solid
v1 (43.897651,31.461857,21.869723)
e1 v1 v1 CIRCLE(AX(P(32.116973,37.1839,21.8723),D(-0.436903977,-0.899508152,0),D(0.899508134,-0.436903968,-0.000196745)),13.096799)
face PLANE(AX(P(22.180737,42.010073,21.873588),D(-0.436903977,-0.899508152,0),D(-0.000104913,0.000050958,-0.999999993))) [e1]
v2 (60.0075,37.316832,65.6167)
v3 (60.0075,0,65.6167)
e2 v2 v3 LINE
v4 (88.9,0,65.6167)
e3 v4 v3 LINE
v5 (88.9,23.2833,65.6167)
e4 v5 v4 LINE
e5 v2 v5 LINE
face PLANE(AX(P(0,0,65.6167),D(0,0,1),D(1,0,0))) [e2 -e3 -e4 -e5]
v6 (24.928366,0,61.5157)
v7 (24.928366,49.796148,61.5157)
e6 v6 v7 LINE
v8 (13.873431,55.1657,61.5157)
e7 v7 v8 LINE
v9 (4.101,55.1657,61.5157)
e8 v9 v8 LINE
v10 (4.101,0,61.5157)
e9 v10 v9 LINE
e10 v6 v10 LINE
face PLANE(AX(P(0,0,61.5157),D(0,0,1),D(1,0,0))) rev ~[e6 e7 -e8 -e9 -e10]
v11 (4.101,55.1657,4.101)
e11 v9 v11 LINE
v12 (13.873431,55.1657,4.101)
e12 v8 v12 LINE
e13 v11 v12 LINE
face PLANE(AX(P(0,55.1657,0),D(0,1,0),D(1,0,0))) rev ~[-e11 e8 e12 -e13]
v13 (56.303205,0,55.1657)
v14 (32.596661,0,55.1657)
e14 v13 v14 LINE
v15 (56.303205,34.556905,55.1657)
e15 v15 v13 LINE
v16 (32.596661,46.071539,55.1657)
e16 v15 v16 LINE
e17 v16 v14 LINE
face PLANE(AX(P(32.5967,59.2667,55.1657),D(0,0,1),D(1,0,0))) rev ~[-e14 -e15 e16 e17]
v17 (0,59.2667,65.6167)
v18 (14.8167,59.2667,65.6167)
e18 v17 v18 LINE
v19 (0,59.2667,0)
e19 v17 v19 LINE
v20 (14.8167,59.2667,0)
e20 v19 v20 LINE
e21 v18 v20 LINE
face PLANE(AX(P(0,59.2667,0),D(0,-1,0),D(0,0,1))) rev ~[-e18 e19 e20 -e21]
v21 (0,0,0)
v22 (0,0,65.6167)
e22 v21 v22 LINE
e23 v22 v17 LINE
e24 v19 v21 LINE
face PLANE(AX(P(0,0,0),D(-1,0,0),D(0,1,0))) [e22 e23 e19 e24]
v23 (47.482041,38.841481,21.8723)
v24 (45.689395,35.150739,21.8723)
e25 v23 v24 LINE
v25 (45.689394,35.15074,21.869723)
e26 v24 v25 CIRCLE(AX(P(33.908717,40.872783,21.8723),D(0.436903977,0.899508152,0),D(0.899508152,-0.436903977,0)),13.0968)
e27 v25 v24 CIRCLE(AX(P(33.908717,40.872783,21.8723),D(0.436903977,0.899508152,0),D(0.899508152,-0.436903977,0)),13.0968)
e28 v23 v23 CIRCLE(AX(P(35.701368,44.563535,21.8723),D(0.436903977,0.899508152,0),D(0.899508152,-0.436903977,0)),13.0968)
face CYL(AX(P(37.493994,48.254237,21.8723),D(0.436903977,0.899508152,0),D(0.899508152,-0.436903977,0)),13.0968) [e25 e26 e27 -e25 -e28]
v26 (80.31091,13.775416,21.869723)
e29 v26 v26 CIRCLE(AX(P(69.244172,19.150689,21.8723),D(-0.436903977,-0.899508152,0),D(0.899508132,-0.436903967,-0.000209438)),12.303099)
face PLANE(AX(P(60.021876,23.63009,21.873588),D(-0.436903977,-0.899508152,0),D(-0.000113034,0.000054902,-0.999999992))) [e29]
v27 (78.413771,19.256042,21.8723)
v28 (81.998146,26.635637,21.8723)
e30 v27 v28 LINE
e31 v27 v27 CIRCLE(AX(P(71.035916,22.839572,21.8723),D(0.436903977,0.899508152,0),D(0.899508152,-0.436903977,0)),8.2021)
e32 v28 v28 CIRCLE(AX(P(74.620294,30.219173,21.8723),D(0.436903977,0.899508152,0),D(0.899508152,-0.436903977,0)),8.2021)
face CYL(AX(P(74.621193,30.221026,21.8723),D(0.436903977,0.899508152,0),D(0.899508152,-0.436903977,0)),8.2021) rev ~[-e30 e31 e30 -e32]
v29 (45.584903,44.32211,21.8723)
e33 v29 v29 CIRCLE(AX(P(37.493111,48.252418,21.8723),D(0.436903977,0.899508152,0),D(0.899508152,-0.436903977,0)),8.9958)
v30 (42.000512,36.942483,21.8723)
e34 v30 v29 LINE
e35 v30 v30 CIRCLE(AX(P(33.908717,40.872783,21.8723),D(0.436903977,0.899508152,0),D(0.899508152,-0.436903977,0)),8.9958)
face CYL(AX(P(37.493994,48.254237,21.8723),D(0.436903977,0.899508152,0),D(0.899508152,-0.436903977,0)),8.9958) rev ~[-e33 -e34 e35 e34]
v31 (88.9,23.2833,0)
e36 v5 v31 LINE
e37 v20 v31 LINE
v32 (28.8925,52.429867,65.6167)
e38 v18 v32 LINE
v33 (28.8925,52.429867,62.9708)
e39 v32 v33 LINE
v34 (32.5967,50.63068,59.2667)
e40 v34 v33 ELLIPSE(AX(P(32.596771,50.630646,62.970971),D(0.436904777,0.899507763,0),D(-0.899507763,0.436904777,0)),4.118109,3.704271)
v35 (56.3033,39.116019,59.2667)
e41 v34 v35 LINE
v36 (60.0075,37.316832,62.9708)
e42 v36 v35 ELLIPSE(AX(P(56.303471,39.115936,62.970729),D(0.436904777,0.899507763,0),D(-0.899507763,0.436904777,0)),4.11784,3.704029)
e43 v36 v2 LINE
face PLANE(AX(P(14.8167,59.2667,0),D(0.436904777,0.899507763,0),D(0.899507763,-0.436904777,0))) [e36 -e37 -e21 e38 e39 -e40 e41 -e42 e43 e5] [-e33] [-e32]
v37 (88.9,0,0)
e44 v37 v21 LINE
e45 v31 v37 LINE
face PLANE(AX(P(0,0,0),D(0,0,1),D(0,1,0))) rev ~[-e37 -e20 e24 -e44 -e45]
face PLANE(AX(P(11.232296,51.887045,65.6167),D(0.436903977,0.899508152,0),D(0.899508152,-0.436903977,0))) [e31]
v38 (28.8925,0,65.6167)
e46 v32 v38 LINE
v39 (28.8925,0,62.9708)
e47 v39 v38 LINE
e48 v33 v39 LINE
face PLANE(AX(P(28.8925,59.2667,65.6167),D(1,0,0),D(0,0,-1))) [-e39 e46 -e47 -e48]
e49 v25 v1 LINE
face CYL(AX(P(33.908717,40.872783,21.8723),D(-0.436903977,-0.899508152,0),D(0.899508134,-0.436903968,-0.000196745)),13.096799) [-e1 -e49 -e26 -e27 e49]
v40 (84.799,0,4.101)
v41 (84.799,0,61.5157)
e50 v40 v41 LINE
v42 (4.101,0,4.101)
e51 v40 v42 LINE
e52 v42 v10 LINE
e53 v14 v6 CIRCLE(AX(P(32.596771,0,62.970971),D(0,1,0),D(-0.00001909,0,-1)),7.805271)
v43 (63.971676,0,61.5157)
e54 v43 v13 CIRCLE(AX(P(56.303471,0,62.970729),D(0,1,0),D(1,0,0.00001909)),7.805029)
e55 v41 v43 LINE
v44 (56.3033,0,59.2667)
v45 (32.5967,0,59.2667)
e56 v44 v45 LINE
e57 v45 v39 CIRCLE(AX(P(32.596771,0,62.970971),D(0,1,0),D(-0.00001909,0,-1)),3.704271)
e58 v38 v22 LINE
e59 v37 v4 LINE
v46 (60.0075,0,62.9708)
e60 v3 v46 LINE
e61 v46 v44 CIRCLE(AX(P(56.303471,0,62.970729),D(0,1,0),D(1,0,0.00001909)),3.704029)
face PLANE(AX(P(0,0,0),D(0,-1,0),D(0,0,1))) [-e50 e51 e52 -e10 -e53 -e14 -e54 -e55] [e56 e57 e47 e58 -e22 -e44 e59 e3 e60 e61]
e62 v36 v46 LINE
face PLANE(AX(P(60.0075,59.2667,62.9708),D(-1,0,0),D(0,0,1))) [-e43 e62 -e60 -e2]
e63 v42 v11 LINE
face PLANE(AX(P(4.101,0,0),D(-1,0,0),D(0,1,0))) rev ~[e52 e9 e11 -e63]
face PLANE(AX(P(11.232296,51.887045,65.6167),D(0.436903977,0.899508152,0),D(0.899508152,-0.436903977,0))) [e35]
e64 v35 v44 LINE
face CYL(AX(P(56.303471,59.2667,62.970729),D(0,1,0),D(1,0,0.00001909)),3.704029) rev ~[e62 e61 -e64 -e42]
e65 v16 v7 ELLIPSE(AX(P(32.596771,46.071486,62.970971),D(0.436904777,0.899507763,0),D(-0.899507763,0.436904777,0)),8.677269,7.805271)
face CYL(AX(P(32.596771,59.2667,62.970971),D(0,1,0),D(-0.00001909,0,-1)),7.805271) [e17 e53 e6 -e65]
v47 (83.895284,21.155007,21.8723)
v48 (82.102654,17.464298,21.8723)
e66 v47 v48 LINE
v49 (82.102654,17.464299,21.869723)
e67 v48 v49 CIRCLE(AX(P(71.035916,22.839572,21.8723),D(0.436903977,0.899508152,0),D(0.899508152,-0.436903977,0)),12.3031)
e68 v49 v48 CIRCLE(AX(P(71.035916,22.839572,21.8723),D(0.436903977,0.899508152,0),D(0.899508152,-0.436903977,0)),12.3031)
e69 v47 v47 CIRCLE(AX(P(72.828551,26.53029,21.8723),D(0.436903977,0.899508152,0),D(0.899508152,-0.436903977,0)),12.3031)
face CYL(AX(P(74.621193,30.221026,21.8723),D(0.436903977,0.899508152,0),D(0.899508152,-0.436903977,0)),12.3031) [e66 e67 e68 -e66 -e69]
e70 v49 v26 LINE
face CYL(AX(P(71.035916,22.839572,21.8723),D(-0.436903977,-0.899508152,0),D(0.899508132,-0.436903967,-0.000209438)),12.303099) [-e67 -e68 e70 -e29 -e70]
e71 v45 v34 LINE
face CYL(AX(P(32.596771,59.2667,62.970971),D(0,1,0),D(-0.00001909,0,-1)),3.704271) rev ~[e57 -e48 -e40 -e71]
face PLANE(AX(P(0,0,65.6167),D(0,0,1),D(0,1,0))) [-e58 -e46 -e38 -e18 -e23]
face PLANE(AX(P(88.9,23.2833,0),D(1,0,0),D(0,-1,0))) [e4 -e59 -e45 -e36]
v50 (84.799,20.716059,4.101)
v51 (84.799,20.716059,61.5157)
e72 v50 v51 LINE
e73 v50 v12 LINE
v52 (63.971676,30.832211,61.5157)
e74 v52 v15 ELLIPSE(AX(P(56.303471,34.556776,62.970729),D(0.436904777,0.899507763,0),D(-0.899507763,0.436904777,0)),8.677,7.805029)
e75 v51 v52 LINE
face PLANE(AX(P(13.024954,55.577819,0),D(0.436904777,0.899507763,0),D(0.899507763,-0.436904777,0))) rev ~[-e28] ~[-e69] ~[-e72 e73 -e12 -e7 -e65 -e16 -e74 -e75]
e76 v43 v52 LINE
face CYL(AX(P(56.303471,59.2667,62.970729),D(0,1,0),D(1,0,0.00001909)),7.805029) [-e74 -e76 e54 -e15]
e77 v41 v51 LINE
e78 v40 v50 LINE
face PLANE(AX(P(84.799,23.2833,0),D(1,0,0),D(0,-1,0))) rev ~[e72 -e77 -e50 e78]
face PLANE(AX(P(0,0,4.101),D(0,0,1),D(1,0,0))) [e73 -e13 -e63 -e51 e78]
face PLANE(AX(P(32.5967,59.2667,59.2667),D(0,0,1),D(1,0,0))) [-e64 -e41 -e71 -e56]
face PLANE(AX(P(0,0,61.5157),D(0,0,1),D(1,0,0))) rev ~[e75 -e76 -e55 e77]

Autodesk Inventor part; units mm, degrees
ref_plane "YZ Plane" through (0, 0, 0) normal (1, 0, 0) x (0, 1, 0)
ref_plane "XZ Plane" through (0, 0, 0) normal (0, 1, 0) x (-1, 0, 0)
ref_plane "XY Plane" through (0, 0, 0) normal (0, 0, 1) x (1, 0, 0)
sketch "Sketch1" plane through (0, 0, 0) normal (0, 0, 1) x (1, 0, 0)
  line L0 (0, 0) -> (0, 59.2667)
  line L1 (0, 59.2667) -> (14.8167, 59.2667)
  line L2 (14.8167, 59.2667) -> (88.9, 23.2833)
  line L3 (88.9, 23.2833) -> (88.9, 0)
  line L4 (88.9, 0) -> (0, 0)
  dimension "OverallHeight" = 59.2667
  dimension "TopWidth" = 14.8167
  dimension "RightHeight" = 23.2833
  dimension "OverallWidth" = 88.9
extrude "Extrusion1" add sketch "Sketch1" along normal blind 65.6167
sketch "Sketch2" plane through (14.8167, 59.2667, 65.6167) normal (0.436904, 0.8995082, 0) x (0.8995082, -0.436904, 0)
  circle A0 centre (25.2098, 43.7444) radius 8.9958
  circle A1 centre (66.4848, 43.7444) radius 8.2021
  line L0 (0, 65.6167) -> (82.3598, 65.6167) projected
  line L1 (82.3598, 65.6167) -> (82.3598, 0) projected
  point P0 (12.5661, 65.6167)
  dimension "UpperHoleDiameter" = 17.9917
  dimension "LowerHoleDiameter" = 16.4042
  dimension "EdgeDistance" = 15.875
  dimension "HoleAllignment" = 0
  dimension "HoleToCenter" = 41.275
  dimension "BackEdgeToHoleCenters" = 21.8722
extrude "Extrusion2" cut sketch "Sketch2" against normal blind 8.2021
sketch "Sketch3" plane through (14.8167, 59.2667, 65.6167) normal (0.436904, 0.8995082, 0) x (0.8995082, -0.436904, 0)
  line L0 (82.3598, 0) -> (0, 0) projected
  line L1 (22.3523, 0) -> (53.4673, 0)
  line L2 (26.0565, 6.35) -> (49.7632, 6.35)
  line L3 (22.3523, 0) -> (22.3523, 2.6458)
  line L4 (53.4673, 2.6458) -> (53.4673, 0)
  line L5 (82.3598, 65.6167) -> (82.3598, 0) projected
  arc A0 (26.0565, 6.35) -> (22.3523, 2.6458) centre (26.0565, 2.6458) ccw
  arc A1 (53.4673, 2.6458) -> (49.7632, 6.35) centre (49.7632, 2.6458) ccw
  point P0 (12.5661, 65.6167)
  dimension "NotchWidth" = 31.115
  dimension "NotchDepth" = 6.35
  dimension "NotchLocation" = 28.8925
  dimension "d18" = 3.7042
sketch "Sketch4" plane through (0, 59.2667, 0) normal (0, 1, 0) x (1, 0, 0)
  line L0 (88.9, -65.6167) -> (0, -65.6167)
  line L1 (28.8925, -65.6167) -> (60.0075, -65.6167)
  line L2 (32.5967, -59.2667) -> (56.3033, -59.2667)
  line L3 (28.8925, -65.6167) -> (28.8925, -62.9708)
  line L4 (60.0075, -62.9708) -> (60.0075, -65.6167)
  line L5 (88.9, 57.15) -> (88.9, -65.6167)
  arc A0 (32.5967, -59.2667) -> (28.8925, -62.9708) centre (32.5967, -62.9708) ccw
  arc A1 (60.0075, -62.9708) -> (56.3033, -59.2667) centre (56.3033, -62.9708) ccw
  line L6 (14.8167, -65.6167) -> (0, -65.6167) projected
  line L7 (88.9, 0) -> (88.9, -65.6167) projected
  point P0 (0, 0)
  point P1 (11.3592, 57.15)
  dimension "d19" = 31.115
  dimension "d20" = 6.35
  dimension "d21" = 28.8925
  dimension "d22" = 3.7042
  dimension "d26" = 0
  dimension "d27" = 0
extrude "Extrusion3" cut sketch "Sketch4" against normal through all
shell "Shell1" thickness 4.101 removed faces 1 at (40.4989, 0, 19.7556)
equation "\"OverallWidth\" = 1.5 * OverallHeight"
equation "\"BackEdgeToHoleCenters\" = 0.333333 * Depth"
equation "\"HoleDepth\" = 0.5 * LowerHoleDiameter"
equation "\"NotchWidth\" = 0.35 * OverallWidth"
equation "\"NotchLocation\" = 0.5 * OverallWidth - 0.5 * NotchWidth"
equation "\"d18\" = 0.25 * TopWidth"
equation "\"d19\" = 0.35 * OverallWidth"
equation "\"d21\" = 0.5 * OverallWidth - 0.5 * d19"
equation "\"d22\" = 0.25 * TopWidth"
equation "\"d28\" = 0.5 * LowerHoleDiameter"
equation "\"ShellThickness\" = 0.5 * HoleDepth"
equation "\"d23\" = 1.5 * OverallHeight"
equation "\"d24\" = TopWidth"
equation "\"d25\" = OverallHeight"
equation "\"Depth\" = 65.616667"
properties part number "8.2 Q2" material "Aluminum 6061"
